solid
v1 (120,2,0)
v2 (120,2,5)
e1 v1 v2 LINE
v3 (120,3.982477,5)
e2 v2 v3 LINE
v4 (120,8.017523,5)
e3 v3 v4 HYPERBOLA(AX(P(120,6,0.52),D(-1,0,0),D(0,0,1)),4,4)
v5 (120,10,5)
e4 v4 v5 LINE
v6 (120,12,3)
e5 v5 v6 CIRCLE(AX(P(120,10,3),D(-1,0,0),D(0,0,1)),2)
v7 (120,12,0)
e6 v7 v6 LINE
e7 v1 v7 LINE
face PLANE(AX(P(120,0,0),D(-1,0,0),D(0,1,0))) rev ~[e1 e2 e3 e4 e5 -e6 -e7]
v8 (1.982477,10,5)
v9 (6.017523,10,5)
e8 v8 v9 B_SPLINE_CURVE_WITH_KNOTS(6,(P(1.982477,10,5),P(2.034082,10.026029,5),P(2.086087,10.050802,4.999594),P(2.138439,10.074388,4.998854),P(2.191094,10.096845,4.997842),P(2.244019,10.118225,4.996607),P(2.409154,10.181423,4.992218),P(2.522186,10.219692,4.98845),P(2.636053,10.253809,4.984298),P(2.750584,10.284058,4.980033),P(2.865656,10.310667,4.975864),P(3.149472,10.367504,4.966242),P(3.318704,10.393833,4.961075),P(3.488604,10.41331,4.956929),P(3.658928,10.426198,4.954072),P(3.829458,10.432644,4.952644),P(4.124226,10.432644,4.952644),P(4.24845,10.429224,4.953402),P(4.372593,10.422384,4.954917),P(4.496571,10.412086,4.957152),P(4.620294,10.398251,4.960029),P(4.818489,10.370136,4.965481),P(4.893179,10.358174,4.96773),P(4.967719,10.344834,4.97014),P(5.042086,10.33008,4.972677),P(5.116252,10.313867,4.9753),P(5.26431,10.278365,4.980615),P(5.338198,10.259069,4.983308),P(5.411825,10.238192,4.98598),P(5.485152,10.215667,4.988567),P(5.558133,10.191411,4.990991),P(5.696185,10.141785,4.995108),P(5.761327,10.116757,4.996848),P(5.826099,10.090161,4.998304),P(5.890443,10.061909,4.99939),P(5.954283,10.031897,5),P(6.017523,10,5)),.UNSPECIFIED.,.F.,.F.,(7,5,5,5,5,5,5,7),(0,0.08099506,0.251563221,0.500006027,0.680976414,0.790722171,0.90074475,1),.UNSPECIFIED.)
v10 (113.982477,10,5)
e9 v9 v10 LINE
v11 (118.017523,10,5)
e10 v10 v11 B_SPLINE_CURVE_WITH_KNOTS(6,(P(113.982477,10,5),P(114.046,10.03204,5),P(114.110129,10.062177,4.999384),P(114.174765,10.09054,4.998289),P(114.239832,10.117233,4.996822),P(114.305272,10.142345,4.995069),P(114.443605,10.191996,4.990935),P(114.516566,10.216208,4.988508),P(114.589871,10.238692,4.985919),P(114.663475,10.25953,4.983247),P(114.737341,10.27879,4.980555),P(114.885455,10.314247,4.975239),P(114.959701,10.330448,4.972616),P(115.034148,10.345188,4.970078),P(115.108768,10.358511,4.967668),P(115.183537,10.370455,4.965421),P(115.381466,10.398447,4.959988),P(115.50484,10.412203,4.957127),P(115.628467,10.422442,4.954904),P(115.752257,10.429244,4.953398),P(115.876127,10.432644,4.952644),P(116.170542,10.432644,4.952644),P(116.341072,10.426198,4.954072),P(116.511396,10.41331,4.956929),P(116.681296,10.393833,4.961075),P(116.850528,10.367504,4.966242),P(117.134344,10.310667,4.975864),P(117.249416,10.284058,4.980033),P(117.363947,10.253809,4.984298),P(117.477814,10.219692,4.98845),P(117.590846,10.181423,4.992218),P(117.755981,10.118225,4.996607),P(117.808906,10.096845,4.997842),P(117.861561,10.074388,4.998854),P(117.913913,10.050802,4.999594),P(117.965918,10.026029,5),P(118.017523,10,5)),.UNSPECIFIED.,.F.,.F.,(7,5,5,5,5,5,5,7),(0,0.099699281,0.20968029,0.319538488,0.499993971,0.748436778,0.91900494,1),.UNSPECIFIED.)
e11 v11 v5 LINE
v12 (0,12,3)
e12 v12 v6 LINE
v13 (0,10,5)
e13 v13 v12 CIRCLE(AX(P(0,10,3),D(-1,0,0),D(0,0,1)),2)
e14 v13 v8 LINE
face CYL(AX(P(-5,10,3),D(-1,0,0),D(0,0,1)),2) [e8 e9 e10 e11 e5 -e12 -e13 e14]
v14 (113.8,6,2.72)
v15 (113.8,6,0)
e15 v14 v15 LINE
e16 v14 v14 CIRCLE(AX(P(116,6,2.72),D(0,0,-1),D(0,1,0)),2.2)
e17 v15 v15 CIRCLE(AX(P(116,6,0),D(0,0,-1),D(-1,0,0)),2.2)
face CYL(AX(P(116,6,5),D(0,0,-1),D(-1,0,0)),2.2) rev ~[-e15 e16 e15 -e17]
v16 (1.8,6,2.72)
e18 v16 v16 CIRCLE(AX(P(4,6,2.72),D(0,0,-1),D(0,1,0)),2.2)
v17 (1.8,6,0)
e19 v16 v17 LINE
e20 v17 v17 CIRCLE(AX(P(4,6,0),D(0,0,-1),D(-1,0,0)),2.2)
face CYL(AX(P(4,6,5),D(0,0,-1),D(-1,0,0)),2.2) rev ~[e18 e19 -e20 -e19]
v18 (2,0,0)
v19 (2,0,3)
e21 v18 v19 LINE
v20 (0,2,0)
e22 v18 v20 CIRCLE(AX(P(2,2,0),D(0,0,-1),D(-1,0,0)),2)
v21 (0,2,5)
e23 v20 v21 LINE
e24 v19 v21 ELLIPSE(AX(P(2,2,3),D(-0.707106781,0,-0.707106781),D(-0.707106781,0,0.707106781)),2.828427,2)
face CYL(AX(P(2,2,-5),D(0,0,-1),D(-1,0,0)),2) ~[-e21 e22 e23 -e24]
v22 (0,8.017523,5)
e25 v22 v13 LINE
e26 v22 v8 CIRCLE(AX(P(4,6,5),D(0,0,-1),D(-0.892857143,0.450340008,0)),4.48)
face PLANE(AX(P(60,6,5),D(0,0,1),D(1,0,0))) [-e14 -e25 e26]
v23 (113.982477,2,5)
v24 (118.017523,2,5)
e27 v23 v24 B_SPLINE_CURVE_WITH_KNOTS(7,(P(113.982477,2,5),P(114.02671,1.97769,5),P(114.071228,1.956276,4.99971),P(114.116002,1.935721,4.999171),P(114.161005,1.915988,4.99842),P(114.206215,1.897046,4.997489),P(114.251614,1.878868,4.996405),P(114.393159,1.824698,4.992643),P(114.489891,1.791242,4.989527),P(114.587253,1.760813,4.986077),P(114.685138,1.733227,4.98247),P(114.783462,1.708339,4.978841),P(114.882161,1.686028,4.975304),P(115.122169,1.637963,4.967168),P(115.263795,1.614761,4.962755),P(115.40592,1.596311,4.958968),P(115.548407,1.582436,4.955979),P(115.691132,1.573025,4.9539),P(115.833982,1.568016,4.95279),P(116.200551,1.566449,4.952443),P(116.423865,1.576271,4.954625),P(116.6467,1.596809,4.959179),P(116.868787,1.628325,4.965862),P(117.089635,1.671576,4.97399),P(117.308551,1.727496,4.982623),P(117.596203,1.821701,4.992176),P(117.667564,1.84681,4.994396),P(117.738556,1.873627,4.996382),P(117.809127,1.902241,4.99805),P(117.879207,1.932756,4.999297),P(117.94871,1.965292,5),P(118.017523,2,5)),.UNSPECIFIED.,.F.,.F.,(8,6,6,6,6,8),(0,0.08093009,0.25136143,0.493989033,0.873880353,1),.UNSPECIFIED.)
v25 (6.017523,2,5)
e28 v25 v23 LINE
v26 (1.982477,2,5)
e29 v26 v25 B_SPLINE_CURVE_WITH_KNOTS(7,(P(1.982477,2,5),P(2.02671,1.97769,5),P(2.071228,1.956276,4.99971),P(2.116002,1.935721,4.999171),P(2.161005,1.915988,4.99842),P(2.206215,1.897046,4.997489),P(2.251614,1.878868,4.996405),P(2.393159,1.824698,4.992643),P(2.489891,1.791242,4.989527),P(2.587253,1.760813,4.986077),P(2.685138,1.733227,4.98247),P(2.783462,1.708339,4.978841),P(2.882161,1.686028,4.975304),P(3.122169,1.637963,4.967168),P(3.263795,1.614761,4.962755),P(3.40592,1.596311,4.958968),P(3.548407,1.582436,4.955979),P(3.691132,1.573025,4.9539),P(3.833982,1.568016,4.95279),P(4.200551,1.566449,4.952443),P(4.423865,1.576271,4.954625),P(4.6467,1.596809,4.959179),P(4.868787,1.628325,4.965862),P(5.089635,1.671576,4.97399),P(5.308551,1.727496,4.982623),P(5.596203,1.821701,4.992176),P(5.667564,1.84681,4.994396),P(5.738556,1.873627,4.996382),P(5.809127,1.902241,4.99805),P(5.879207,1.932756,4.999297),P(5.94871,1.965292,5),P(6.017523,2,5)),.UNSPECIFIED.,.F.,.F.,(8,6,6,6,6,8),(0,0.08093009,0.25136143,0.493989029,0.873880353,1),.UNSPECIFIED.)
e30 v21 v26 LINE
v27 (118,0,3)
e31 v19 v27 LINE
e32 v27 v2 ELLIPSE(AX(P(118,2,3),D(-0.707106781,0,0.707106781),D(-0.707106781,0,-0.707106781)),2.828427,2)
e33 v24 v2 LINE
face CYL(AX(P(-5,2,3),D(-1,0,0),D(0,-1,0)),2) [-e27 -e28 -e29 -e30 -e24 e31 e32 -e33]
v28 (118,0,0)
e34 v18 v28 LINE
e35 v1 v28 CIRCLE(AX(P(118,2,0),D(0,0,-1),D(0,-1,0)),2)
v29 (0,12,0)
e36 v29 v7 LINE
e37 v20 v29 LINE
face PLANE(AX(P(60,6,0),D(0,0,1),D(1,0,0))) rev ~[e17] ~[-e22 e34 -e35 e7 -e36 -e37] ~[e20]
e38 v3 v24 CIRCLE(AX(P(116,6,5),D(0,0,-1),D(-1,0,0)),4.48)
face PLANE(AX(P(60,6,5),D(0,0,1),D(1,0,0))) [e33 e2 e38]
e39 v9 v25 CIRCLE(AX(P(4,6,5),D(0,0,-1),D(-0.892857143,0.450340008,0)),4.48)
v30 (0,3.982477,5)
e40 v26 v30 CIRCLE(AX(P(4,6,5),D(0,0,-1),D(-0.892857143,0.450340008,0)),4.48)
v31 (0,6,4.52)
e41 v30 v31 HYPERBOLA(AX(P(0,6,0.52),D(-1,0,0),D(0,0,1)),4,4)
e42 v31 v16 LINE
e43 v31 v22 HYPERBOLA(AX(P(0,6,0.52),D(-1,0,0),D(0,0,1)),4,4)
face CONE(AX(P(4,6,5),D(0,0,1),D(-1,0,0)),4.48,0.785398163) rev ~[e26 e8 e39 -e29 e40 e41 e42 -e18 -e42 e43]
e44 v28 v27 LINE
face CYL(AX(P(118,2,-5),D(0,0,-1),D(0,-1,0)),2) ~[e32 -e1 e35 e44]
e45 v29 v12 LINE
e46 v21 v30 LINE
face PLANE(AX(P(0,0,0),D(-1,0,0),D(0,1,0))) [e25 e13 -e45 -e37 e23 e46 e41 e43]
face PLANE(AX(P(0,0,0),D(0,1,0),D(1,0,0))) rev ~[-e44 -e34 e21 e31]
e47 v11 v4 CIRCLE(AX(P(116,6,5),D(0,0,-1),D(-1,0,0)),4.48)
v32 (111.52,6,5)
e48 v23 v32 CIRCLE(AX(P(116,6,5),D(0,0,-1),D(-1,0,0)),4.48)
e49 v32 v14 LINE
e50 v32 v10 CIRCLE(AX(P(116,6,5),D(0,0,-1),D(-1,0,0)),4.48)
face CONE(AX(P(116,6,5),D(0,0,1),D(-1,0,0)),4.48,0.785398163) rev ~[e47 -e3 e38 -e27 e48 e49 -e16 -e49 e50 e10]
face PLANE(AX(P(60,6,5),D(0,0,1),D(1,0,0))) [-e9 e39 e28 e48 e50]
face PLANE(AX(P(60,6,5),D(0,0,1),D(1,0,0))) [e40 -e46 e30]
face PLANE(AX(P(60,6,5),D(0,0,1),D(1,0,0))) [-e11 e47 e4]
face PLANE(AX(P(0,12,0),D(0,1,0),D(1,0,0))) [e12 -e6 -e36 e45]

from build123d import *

# Parameters (mm, degrees)
F0_W           = 120
F0_H           = 12
F1_DEPTH       = 5
F3_D           = 4.4
F3_DEPTH       = 18
F3_CSINK_D     = 8.96
F3_CSINK_ANGLE = 90
F3_TIP         = 1.3218933619
F4_T1_DEPTH    = 130
F4_T3_DEPTH    = 15


# Not quite as in the source:
# - a fillet or chamfer that OpenCascade refuses, or shapes differently, is made with other operations: its cross-section is extruded or revolved along the edge and cut away or added


with BuildPart() as f1:
    # F0 (on Top) → F1 (new body)
    with BuildSketch(Plane.XY):
        with Locations((60, 6)):
            Rectangle(F0_W, F0_H)
    extrude(amount=F1_DEPTH)

    # F3
    with Locations(Plane.XY.offset(5)):
        with Locations((4, 6), (116, 6)):
            CounterSinkHole(F3_D / 2, F3_CSINK_D / 2, depth=F3_DEPTH, counter_sink_angle=F3_CSINK_ANGLE)
            with Locations((0, 0, -(F3_DEPTH + F3_TIP / 2))):  # 118° drill point
                Cone(0, F3_D / 2, F3_TIP, mode=Mode.SUBTRACT)

    # F4: fillet of radius 2 on 4 edges, made by hand

    # F4_s2 → F4_t1 (cut)
    with BuildSketch(Plane.YZ.offset(-5)):
        with BuildLine():
            ThreePointArc((0, 3), (0.5857864376, 4.4142135624), (2, 5))
            Line((2, 5), (0, 5))
            Line((0, 5), (0, 3))
        make_face()
        with BuildLine():
            ThreePointArc((10, 5), (11.4142135624, 4.4142135624), (12, 3))
            Line((12, 3), (12, 5))
            Line((12, 5), (10, 5))
        make_face()
    extrude(amount=F4_T1_DEPTH, mode=Mode.SUBTRACT)

    # F4_s4 → F4_t3 (cut)
    with BuildSketch(Plane.XY.offset(-5)):
        with BuildLine():
            ThreePointArc((0, 2), (0.5857864376, 0.5857864376), (2, 0))
            Line((2, 0), (0, 0))
            Line((0, 0), (0, 2))
        make_face()
        with BuildLine():
            ThreePointArc((118, 0), (119.4142135624, 0.5857864376), (120, 2))
            Line((120, 2), (120, 0))
            Line((120, 0), (118, 0))
        make_face()
    extrude(amount=F4_T3_DEPTH, mode=Mode.SUBTRACT)


solid = f1.part
